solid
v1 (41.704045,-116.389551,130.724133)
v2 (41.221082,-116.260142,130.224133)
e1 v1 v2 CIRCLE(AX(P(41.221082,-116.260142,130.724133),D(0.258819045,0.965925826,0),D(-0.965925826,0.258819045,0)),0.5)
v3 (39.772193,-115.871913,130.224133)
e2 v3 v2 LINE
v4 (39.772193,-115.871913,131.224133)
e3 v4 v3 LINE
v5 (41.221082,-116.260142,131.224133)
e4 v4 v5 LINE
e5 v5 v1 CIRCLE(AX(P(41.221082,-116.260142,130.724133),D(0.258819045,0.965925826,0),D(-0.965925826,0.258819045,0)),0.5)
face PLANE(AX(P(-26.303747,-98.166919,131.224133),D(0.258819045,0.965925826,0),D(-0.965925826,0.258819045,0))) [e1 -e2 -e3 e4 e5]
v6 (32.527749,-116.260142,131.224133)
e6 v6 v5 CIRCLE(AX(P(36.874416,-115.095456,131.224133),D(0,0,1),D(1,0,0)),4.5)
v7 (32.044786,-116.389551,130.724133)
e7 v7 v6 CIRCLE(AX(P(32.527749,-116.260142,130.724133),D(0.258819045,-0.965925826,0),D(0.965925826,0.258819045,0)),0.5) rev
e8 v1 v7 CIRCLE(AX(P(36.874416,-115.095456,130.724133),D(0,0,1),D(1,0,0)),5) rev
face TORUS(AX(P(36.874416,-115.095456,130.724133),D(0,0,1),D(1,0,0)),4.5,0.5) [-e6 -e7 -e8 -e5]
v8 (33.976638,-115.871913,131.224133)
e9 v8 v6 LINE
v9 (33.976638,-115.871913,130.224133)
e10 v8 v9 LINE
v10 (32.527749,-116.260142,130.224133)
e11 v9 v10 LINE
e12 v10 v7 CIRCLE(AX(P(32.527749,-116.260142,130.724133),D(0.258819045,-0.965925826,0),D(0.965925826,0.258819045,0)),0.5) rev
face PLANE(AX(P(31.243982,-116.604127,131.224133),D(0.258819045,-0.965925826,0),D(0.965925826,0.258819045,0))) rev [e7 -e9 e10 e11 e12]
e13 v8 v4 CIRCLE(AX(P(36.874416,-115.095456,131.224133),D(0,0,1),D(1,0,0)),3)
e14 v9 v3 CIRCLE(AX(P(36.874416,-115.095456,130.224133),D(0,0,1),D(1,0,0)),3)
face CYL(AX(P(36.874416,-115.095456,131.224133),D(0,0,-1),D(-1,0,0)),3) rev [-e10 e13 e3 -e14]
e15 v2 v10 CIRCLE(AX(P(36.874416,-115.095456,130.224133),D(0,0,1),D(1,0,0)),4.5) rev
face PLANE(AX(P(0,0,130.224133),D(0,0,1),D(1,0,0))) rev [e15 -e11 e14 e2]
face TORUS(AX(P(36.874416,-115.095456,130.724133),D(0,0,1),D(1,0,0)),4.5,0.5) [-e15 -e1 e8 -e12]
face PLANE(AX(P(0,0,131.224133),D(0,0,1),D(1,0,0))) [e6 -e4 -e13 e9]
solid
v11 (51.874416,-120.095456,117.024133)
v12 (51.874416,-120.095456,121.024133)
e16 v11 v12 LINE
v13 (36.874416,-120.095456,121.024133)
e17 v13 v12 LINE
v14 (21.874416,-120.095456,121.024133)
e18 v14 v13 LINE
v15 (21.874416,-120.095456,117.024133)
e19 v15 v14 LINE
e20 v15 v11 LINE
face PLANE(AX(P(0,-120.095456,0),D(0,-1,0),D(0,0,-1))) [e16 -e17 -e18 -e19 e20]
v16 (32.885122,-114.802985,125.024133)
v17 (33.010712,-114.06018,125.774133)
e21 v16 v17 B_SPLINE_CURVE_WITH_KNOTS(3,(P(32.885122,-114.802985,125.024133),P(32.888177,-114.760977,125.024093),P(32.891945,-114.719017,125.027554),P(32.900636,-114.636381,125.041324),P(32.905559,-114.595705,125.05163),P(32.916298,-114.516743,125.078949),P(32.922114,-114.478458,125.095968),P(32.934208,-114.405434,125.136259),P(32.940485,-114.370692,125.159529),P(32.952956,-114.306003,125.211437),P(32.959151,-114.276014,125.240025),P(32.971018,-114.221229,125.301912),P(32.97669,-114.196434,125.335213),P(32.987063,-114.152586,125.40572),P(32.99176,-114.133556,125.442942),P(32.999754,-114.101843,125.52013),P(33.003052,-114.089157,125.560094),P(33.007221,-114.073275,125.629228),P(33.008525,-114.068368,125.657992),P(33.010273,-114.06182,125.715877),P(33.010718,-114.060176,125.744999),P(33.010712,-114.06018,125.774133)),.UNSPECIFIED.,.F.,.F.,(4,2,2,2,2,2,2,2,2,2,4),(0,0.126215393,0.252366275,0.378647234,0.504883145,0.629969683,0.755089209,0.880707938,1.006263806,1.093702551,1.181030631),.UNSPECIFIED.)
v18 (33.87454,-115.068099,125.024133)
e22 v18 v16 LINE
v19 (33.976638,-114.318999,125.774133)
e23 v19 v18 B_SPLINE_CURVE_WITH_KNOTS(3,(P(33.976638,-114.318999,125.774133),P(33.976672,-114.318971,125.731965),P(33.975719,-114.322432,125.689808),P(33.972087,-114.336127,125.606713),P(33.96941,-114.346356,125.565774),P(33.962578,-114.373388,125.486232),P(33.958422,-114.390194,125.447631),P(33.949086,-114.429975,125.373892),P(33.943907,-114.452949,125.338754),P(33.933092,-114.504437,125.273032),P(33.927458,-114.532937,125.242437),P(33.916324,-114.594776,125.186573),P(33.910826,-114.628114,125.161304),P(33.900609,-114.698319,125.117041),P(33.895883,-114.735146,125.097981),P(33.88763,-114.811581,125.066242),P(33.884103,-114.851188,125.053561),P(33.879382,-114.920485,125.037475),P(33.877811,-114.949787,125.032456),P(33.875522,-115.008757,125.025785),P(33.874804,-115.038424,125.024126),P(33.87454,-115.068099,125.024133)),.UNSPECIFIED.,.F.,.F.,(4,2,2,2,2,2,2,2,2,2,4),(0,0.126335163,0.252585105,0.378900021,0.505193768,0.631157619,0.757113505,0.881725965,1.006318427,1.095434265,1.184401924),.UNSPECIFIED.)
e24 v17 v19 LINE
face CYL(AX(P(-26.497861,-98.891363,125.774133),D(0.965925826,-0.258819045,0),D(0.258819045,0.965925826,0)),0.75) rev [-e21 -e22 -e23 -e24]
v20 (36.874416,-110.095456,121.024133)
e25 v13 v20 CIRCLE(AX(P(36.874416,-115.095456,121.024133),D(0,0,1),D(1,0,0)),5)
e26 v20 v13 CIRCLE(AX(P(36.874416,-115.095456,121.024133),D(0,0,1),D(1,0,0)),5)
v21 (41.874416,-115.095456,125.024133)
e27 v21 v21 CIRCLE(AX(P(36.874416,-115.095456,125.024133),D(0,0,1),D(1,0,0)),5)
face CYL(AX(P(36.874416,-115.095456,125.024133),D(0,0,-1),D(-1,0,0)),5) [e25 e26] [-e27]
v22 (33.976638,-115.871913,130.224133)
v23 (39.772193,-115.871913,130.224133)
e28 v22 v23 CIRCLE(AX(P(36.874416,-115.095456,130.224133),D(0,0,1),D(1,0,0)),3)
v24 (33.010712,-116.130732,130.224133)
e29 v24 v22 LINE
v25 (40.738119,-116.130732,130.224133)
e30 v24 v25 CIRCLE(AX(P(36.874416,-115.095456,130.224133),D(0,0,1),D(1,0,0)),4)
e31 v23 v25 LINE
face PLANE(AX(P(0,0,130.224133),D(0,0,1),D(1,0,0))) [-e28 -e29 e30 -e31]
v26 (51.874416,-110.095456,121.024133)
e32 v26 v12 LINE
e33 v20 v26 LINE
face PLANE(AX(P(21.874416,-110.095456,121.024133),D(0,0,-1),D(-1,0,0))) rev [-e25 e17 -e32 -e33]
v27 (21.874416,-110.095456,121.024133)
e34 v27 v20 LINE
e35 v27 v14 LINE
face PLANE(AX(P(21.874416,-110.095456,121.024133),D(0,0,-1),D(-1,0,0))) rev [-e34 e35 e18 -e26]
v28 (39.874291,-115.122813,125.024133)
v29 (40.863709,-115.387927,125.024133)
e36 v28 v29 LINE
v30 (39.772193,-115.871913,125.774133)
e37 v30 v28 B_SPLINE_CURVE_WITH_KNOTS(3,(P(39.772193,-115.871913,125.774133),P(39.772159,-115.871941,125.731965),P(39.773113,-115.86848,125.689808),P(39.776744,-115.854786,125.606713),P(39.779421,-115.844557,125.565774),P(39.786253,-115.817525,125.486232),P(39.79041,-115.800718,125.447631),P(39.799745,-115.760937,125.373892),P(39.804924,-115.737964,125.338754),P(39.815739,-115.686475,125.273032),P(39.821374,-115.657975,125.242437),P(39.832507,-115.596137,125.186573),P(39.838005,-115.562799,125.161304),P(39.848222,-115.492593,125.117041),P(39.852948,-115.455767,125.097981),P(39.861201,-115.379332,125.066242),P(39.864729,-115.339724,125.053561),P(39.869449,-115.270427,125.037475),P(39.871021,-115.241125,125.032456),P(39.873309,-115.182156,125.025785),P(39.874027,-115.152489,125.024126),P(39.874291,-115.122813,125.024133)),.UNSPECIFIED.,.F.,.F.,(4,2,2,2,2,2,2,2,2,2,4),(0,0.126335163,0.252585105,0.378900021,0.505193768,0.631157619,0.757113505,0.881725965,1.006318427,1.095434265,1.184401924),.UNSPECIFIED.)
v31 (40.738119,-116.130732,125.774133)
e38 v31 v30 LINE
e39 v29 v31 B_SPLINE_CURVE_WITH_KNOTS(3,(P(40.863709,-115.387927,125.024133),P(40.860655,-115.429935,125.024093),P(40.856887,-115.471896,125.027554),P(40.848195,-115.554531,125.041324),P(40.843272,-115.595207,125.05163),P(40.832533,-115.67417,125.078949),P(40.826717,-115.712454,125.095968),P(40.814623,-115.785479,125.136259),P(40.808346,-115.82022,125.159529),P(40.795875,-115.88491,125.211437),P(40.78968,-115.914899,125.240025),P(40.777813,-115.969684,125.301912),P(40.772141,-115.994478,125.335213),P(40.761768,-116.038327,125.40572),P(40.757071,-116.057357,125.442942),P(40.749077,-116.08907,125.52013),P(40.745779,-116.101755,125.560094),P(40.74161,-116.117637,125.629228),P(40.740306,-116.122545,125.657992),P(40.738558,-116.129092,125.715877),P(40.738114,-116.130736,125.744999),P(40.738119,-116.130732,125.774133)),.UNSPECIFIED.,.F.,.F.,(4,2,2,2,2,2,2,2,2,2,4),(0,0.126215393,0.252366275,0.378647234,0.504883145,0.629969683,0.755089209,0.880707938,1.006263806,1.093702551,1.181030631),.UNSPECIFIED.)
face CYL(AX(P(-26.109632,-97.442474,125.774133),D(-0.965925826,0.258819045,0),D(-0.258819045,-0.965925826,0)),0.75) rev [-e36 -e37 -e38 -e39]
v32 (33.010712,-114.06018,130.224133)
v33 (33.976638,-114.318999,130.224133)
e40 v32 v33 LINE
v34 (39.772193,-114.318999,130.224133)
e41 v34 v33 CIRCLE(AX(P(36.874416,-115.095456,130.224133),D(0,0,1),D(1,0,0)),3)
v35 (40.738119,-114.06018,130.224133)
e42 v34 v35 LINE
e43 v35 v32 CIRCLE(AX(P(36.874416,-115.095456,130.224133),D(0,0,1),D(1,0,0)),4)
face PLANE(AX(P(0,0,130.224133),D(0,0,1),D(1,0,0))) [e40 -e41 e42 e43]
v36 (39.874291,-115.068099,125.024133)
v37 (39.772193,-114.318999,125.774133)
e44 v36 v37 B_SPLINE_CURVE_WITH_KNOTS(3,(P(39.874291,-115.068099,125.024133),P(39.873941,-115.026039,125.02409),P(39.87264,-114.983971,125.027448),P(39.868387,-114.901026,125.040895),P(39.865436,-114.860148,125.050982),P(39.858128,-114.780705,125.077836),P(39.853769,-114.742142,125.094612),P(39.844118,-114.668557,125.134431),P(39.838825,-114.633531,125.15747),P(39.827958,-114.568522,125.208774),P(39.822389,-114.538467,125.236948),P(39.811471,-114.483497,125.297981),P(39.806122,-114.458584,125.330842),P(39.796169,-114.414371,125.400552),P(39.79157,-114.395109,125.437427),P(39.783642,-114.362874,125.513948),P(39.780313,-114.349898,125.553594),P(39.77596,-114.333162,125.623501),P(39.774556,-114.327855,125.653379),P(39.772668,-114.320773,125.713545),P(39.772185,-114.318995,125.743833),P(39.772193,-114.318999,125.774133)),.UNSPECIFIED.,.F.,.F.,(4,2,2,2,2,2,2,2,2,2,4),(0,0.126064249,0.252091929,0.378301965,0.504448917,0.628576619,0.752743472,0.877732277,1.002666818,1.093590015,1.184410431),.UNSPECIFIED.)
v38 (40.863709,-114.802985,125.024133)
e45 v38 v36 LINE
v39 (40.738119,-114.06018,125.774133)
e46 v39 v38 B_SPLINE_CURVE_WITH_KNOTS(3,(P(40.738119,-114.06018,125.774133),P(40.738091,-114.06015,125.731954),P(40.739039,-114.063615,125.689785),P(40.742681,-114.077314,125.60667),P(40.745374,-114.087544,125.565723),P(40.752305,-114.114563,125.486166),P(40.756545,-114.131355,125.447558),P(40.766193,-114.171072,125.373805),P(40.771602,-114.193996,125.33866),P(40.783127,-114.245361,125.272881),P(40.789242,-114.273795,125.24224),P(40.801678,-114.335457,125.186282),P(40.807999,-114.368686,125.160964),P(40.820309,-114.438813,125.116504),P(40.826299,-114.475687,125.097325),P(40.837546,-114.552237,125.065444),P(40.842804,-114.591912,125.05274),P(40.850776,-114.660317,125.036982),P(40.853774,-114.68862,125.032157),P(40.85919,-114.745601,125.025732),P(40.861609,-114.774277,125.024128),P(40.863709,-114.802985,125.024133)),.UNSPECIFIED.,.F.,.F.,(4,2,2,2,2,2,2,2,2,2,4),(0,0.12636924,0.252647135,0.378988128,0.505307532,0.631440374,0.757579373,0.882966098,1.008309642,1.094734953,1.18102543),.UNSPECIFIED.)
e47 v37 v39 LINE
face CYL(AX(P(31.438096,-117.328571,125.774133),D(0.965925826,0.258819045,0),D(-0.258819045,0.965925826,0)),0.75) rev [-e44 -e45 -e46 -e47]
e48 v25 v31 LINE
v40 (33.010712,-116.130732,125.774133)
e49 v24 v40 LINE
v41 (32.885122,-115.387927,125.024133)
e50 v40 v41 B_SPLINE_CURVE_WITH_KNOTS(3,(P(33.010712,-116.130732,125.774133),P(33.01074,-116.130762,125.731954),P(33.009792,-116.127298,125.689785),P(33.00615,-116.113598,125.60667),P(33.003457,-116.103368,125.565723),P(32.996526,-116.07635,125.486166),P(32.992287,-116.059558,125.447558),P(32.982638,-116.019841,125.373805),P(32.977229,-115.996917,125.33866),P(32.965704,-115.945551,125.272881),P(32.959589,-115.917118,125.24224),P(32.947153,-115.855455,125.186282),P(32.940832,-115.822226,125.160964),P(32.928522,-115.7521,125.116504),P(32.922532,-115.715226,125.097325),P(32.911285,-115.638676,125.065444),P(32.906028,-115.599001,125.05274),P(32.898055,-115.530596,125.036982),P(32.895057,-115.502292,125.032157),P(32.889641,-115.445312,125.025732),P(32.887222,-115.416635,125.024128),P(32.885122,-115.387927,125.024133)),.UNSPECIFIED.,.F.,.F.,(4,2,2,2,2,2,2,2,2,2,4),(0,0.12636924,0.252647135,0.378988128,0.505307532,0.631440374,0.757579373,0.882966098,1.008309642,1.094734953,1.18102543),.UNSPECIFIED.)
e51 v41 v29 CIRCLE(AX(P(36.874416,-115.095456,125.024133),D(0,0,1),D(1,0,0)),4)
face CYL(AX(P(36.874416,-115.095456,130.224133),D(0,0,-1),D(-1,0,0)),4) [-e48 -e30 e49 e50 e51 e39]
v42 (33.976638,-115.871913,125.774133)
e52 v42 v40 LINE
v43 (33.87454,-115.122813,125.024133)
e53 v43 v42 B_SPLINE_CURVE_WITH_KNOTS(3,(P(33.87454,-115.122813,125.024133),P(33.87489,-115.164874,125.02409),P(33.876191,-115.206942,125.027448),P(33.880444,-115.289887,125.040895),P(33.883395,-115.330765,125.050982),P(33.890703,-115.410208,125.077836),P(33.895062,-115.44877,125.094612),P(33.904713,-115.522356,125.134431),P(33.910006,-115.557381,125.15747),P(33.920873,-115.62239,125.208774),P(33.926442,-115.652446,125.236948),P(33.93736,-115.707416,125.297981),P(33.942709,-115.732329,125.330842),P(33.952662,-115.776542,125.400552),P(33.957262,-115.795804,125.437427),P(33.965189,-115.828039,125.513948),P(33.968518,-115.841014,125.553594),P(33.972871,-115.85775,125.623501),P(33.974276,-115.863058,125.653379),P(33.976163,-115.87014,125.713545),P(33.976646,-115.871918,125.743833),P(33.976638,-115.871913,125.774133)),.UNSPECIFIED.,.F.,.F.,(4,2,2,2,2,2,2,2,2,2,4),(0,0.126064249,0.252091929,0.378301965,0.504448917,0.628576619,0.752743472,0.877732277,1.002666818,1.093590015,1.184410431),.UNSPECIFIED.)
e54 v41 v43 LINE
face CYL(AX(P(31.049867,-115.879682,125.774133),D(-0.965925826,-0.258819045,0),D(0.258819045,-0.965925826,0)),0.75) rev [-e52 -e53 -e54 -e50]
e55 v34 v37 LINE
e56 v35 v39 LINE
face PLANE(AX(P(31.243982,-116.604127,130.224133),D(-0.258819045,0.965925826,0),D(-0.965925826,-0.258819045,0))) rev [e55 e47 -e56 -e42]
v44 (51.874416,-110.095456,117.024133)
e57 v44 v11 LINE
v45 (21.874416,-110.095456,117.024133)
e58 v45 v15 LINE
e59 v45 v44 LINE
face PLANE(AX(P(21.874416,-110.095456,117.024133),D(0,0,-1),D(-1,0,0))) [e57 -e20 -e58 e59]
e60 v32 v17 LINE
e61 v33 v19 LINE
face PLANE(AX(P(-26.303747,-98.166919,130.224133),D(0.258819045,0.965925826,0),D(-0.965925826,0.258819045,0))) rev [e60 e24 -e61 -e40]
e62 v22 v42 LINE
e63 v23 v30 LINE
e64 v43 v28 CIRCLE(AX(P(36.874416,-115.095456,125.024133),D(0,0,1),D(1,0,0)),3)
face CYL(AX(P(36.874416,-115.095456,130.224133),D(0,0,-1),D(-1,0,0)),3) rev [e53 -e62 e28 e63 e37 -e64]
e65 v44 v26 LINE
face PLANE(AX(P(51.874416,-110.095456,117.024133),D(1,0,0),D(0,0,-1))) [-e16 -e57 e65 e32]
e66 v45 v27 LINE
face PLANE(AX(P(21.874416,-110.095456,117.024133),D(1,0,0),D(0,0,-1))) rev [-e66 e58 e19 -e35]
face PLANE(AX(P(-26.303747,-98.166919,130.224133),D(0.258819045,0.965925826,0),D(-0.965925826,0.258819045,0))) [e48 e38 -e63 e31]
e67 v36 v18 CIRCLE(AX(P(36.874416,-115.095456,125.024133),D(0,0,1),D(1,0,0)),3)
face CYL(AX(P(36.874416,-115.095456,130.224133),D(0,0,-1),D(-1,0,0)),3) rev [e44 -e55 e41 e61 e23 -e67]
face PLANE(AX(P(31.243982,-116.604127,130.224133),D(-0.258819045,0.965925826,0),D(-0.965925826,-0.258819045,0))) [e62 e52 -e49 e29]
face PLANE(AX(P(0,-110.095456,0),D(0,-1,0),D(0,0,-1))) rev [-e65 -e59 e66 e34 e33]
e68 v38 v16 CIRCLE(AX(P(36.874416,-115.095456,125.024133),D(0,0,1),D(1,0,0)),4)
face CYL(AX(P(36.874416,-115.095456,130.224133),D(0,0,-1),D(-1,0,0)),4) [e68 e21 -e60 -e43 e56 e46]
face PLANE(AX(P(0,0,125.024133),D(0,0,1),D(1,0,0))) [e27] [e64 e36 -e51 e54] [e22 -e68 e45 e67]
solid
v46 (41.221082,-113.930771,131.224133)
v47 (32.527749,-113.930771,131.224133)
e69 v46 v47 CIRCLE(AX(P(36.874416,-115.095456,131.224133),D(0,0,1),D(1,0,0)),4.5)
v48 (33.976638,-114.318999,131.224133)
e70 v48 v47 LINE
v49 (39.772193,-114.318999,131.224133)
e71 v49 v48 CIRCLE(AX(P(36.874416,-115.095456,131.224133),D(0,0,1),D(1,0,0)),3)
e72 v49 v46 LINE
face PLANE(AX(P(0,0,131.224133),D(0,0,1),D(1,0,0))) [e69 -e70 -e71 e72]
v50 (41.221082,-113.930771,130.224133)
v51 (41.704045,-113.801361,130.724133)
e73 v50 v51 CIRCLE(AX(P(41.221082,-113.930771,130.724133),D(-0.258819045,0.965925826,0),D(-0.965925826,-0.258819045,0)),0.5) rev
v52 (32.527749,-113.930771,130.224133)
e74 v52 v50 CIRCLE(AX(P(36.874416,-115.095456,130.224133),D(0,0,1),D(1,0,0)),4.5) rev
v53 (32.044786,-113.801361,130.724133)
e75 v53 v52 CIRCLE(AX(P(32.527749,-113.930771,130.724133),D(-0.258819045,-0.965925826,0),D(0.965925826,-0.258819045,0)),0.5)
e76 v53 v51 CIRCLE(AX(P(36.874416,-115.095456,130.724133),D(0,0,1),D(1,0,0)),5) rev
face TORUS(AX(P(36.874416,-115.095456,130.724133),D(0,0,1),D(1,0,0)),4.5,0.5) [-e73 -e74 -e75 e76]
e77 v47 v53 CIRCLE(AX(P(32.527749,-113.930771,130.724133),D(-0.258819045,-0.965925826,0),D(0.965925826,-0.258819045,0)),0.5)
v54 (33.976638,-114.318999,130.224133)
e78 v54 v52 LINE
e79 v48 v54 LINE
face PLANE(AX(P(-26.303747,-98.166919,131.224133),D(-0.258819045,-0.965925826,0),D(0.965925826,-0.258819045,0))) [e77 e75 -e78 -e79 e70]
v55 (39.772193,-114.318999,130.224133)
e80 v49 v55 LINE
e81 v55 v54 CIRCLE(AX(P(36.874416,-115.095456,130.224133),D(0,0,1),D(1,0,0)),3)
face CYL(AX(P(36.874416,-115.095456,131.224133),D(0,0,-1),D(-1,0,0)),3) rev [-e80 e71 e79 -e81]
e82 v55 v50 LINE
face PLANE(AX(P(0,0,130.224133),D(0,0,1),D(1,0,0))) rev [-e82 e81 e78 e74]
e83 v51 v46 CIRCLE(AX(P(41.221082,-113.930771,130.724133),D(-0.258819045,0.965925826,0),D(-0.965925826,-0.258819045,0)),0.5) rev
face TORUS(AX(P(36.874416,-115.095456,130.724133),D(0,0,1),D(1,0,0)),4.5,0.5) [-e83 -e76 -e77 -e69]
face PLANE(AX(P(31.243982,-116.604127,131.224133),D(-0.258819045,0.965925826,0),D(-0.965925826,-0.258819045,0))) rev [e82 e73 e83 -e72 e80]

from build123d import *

# Parameters (mm, degrees)
SKETCH1_W             = 30
SKETCH1_H             = 4
BOSS_EXTRUDE1_DEPTH   = 10
SKETCH2_R             = 5
SKETCH2_R_2           = 4
BOSS_EXTRUDE2_DEPTH   = 4
BOSS_EXTRUDE3_DEPTH   = 5.2
BOSS_EXTRUDE5_DEPTH   = 1
BOSS_EXTRUDE5_2_DEPTH = 1
FILLET2_R             = 0.75
FILLET3_R             = 0.5
FILLET4_R             = 0.5


with BuildPart() as part:
    # Sketch1 → Boss-Extrude1 (new body)
    with BuildSketch(Plane(origin=(0, -120.095456241, 0), x_dir=(1, 0, 0), z_dir=(0, 1, 0))):
        with Locations((36.874415609, -119.024132807)):
            Rectangle(SKETCH1_W, SKETCH1_H)
    extrude(amount=BOSS_EXTRUDE1_DEPTH)

    # Sketch2 → Boss-Extrude2 (add)
    # profile 1 of 2: a face of its own
    with BuildSketch(Plane.XY.offset(121.024132807)):
        with Locations(Location((36.874415609, -115.095456241, 0), (0, 0, 270))):
            Circle(SKETCH2_R)
        with Locations((36.874415609, -115.095456241)):
            Circle(SKETCH2_R_2, mode=Mode.SUBTRACT)
    # profile 2 of 2: a face of its own
    with BuildSketch(Plane.XY.offset(121.024132807)):
        with Locations((36.874415609, -115.095456241)):
            Circle(SKETCH2_R_2)
    extrude(amount=BOSS_EXTRUDE2_DEPTH)

    # Sketch3 → Boss-Extrude3 (add)
    with BuildSketch(Plane.XY.offset(125.024132807)):
        with BuildLine():
            ThreePointArc((33.97663813, -114.318999106), (36.874415609, -112.095456241), (39.772193088, -114.318999106))
            Line((39.772193088, -114.318999106), (40.738118914, -114.060180061))
            ThreePointArc((40.738118914, -114.060180061), (36.874415609, -111.095456241), (33.010712304, -114.060180061))
            Line((33.010712304, -114.060180061), (33.97663813, -114.318999106))
        make_face()
        with BuildLine():
            Line((40.738118914, -116.130732422), (39.772193088, -115.871913377))
            ThreePointArc((39.772193088, -115.871913377), (36.874415609, -118.095456241), (33.97663813, -115.871913377))
            Line((33.97663813, -115.871913377), (33.010712304, -116.130732422))
            ThreePointArc((33.010712304, -116.130732422), (36.874415609, -119.095456241), (40.738118914, -116.130732422))
        make_face()
    extrude(amount=BOSS_EXTRUDE3_DEPTH)

    # Fillet2
    fillet2_edges = [part.edges().sort_by_distance(p)[0] for p in [
        (40.255156001, -114.189589584, 125.024132807),
        (33.493675217, -114.189589584, 125.024132807),
        (40.255156001, -116.001322899, 125.024132807),
        (33.493675217, -116.001322899, 125.024132807),
    ]]
    fillet(fillet2_edges, radius=FILLET2_R)


with BuildPart() as body_2:
    # Sketch5 → Boss-Extrude5 (new body)
    with BuildSketch(Plane.XY.offset(130.224132807)):
        with BuildLine():
            Line((33.010712304, -114.060180061), (33.97663813, -114.318999106))
            ThreePointArc((33.97663813, -114.318999106), (36.874415609, -112.095456241), (39.772193088, -114.318999106))
            Line((39.772193088, -114.318999106), (40.738118914, -114.060180061))
            Line((40.738118914, -114.060180061), (41.704044741, -113.801361016))
            ThreePointArc((41.704044741, -113.801361016), (36.874415609, -110.095456241), (32.044786478, -113.801361016))
            Line((32.044786478, -113.801361016), (33.010712304, -114.060180061))
        make_face()
    extrude(amount=BOSS_EXTRUDE5_DEPTH)

    # Fillet3
    fillet3_edges = [body_2.edges().sort_by_distance(p)[0] for p in [
        (36.874415609, -110.095456241, 130.224132807),
        (36.874415609, -110.095456241, 131.224132807),
    ]]
    fillet(fillet3_edges, radius=FILLET3_R - 0.0001)  # a hair under: the kernel refuses the full size


with BuildPart() as body_3:
    # Sketch5 → Boss-Extrude5 2 (new body)
    with BuildSketch(Plane.XY.offset(130.224132807)):
        with BuildLine():
            ThreePointArc((39.772193088, -115.871913377), (36.874415609, -118.095456241), (33.97663813, -115.871913377))
            Line((33.97663813, -115.871913377), (33.010712304, -116.130732422))
            Line((33.010712304, -116.130732422), (32.044786478, -116.389551467))
            ThreePointArc((32.044786478, -116.389551467), (36.874415609, -120.095456241), (41.704044741, -116.389551467))
            Line((41.704044741, -116.389551467), (40.738118914, -116.130732422))
            Line((40.738118914, -116.130732422), (39.772193088, -115.871913377))
        make_face()
    extrude(amount=BOSS_EXTRUDE5_2_DEPTH)

    # Fillet4
    fillet4_edges = [body_3.edges().sort_by_distance(p)[0] for p in [
        (36.874415609, -120.095456241, 130.224132807),
        (36.874415609, -120.095456241, 131.224132807),
    ]]
    fillet(fillet4_edges, radius=FILLET4_R - 0.0001)  # a hair under: the kernel refuses the full size


solid = Compound([part.part, body_2.part, body_3.part])
